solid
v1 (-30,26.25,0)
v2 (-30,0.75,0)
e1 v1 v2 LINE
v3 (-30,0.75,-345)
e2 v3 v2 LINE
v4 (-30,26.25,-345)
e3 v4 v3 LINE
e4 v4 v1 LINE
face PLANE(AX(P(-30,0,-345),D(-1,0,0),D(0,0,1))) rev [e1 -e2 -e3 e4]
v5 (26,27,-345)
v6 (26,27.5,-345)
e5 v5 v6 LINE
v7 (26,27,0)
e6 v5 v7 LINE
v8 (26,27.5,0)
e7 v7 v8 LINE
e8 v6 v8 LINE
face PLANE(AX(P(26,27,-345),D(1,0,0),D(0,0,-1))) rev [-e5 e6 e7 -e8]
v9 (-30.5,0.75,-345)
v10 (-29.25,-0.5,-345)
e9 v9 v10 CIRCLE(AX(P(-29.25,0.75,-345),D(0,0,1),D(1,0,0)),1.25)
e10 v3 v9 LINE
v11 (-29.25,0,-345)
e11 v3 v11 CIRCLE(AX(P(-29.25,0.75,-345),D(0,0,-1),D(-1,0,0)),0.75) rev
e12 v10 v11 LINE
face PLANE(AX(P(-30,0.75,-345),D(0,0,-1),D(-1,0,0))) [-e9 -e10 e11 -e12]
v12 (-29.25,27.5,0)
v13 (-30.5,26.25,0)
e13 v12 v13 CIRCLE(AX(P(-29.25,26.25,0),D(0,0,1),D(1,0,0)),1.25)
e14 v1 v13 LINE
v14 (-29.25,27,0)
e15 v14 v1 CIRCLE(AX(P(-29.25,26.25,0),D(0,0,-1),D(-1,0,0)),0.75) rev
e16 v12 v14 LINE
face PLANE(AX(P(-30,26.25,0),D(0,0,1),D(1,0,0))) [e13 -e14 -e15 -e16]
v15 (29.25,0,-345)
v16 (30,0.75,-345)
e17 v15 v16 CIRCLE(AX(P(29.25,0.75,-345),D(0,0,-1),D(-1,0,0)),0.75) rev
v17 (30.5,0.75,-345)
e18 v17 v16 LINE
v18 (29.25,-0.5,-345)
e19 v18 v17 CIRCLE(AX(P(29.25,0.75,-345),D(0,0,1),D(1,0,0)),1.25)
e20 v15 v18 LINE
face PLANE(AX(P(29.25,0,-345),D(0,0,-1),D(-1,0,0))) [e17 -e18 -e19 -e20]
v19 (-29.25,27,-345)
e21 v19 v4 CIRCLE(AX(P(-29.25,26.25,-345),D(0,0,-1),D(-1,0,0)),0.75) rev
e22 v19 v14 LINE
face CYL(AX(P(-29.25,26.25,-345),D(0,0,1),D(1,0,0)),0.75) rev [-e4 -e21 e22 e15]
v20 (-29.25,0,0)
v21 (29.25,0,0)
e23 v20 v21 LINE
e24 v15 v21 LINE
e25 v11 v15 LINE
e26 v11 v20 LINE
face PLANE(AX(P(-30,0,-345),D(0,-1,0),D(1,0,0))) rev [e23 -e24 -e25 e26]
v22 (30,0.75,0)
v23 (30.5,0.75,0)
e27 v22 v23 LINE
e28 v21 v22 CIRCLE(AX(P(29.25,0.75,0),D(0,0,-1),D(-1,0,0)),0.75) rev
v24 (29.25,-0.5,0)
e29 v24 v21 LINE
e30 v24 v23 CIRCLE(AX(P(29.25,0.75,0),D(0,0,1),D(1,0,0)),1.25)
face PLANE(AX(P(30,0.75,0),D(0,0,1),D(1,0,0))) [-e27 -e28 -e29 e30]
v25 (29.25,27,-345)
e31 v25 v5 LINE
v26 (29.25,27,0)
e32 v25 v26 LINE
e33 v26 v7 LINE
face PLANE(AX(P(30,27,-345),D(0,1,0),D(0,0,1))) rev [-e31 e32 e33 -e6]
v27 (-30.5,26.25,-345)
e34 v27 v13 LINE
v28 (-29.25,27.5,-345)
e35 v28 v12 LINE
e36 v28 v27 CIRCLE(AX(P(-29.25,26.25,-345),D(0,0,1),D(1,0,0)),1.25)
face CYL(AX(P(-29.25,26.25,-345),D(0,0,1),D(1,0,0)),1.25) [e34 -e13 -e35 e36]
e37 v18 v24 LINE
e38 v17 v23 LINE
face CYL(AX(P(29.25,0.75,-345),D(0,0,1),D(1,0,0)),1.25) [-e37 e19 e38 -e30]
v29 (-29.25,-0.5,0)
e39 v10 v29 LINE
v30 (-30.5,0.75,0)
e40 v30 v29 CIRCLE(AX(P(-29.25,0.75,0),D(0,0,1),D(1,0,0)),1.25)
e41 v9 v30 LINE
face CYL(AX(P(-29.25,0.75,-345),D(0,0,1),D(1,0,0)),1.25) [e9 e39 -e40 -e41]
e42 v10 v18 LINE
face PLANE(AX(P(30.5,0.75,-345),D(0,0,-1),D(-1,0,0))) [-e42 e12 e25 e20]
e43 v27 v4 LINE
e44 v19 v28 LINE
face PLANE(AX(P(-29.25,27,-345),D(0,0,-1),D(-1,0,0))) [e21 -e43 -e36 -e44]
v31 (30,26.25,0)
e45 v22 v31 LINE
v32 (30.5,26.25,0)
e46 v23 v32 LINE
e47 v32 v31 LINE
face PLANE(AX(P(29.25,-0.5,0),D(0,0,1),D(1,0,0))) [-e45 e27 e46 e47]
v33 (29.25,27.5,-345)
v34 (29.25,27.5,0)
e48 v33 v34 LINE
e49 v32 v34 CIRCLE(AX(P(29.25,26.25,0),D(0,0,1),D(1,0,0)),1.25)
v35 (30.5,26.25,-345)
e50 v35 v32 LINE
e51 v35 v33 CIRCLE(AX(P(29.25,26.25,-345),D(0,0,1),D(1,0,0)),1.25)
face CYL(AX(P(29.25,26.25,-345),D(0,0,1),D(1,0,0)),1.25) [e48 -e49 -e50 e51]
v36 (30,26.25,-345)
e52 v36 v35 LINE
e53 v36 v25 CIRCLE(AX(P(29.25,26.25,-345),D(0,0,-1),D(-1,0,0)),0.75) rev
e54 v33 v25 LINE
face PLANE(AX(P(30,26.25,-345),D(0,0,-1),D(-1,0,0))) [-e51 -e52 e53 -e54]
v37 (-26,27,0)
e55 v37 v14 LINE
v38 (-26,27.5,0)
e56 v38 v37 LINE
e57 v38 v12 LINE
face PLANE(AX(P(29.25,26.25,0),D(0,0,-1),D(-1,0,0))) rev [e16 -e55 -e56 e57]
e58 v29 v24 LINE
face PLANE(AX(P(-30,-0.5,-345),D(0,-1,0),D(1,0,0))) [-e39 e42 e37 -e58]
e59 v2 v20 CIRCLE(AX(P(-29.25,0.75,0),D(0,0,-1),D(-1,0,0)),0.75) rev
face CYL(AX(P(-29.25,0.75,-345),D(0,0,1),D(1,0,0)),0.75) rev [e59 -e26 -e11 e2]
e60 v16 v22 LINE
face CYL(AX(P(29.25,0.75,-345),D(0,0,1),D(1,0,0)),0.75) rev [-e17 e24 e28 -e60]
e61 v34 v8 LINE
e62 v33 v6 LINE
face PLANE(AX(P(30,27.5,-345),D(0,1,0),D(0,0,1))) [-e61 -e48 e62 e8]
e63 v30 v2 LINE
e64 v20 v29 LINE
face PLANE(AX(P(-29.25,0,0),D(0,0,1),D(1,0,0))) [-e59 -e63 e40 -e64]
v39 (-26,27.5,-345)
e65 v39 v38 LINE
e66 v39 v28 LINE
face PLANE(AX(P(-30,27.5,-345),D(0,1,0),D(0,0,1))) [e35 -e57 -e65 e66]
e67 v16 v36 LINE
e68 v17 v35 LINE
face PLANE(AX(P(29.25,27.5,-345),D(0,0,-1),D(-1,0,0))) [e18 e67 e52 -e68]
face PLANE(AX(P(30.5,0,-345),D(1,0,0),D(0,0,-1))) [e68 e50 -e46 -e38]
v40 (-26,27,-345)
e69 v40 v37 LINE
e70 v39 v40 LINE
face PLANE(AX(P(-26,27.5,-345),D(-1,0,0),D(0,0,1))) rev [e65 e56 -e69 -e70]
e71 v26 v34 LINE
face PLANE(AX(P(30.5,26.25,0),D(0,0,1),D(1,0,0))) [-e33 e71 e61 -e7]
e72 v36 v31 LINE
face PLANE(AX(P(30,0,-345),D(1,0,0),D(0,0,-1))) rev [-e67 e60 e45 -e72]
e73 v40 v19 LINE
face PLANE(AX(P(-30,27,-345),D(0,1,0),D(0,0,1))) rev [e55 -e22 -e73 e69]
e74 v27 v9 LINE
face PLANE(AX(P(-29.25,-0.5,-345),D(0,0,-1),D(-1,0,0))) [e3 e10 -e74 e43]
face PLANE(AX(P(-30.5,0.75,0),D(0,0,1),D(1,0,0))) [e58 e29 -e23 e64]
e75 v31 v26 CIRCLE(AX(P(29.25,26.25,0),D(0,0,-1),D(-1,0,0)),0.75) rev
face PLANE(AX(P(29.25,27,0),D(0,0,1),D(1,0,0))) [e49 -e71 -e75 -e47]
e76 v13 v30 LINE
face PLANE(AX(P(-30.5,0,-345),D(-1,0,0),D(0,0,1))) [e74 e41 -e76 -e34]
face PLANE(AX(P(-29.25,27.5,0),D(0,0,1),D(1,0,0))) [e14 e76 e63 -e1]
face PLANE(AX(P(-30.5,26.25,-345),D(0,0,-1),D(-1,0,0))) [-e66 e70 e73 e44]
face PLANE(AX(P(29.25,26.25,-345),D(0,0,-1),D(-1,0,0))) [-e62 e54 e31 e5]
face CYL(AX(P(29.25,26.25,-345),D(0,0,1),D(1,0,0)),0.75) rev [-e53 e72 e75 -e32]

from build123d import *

# Parameters (mm, degrees)
SM_BASE_FLANGE_1_DEPTH = 345


# Sheet-metal steps are written as plain solids
with BuildPart() as part:
    # Sketch 1 → Базовая кромка1 (new body)
    with BuildSketch(Plane.XY):
        with BuildLine():
            Line((-26, 27), (-29.25, 27))
            ThreePointArc((-29.25, 27), (-29.780330086, 26.780330086), (-30, 26.25))
            Line((-30, 26.25), (-30, 0.75))
            ThreePointArc((-30, 0.75), (-29.780330086, 0.219669914), (-29.25, 0))
            Line((-29.25, 0), (29.25, 0))
            ThreePointArc((29.25, 0), (29.780330086, 0.219669914), (30, 0.75))
            Line((30, 0.75), (30, 26.25))
            ThreePointArc((30, 26.25), (29.780330086, 26.780330086), (29.25, 27))
            Line((29.25, 27), (26, 27))
            Line((26, 27), (26, 27.5))
            Line((26, 27.5), (29.25, 27.5))
            ThreePointArc((29.25, 27.5), (30.133883476, 27.133883476), (30.5, 26.25))
            Line((30.5, 26.25), (30.5, 0.75))
            ThreePointArc((30.5, 0.75), (30.133883476, -0.133883476), (29.25, -0.5))
            Line((29.25, -0.5), (-29.25, -0.5))
            ThreePointArc((-29.25, -0.5), (-30.133883476, -0.133883476), (-30.5, 0.75))
            Line((-30.5, 0.75), (-30.5, 26.25))
            ThreePointArc((-30.5, 26.25), (-30.133883476, 27.133883476), (-29.25, 27.5))
            Line((-29.25, 27.5), (-26, 27.5))
            Line((-26, 27.5), (-26, 27))
        make_face()
    extrude(amount=-SM_BASE_FLANGE_1_DEPTH)


solid = part.part
